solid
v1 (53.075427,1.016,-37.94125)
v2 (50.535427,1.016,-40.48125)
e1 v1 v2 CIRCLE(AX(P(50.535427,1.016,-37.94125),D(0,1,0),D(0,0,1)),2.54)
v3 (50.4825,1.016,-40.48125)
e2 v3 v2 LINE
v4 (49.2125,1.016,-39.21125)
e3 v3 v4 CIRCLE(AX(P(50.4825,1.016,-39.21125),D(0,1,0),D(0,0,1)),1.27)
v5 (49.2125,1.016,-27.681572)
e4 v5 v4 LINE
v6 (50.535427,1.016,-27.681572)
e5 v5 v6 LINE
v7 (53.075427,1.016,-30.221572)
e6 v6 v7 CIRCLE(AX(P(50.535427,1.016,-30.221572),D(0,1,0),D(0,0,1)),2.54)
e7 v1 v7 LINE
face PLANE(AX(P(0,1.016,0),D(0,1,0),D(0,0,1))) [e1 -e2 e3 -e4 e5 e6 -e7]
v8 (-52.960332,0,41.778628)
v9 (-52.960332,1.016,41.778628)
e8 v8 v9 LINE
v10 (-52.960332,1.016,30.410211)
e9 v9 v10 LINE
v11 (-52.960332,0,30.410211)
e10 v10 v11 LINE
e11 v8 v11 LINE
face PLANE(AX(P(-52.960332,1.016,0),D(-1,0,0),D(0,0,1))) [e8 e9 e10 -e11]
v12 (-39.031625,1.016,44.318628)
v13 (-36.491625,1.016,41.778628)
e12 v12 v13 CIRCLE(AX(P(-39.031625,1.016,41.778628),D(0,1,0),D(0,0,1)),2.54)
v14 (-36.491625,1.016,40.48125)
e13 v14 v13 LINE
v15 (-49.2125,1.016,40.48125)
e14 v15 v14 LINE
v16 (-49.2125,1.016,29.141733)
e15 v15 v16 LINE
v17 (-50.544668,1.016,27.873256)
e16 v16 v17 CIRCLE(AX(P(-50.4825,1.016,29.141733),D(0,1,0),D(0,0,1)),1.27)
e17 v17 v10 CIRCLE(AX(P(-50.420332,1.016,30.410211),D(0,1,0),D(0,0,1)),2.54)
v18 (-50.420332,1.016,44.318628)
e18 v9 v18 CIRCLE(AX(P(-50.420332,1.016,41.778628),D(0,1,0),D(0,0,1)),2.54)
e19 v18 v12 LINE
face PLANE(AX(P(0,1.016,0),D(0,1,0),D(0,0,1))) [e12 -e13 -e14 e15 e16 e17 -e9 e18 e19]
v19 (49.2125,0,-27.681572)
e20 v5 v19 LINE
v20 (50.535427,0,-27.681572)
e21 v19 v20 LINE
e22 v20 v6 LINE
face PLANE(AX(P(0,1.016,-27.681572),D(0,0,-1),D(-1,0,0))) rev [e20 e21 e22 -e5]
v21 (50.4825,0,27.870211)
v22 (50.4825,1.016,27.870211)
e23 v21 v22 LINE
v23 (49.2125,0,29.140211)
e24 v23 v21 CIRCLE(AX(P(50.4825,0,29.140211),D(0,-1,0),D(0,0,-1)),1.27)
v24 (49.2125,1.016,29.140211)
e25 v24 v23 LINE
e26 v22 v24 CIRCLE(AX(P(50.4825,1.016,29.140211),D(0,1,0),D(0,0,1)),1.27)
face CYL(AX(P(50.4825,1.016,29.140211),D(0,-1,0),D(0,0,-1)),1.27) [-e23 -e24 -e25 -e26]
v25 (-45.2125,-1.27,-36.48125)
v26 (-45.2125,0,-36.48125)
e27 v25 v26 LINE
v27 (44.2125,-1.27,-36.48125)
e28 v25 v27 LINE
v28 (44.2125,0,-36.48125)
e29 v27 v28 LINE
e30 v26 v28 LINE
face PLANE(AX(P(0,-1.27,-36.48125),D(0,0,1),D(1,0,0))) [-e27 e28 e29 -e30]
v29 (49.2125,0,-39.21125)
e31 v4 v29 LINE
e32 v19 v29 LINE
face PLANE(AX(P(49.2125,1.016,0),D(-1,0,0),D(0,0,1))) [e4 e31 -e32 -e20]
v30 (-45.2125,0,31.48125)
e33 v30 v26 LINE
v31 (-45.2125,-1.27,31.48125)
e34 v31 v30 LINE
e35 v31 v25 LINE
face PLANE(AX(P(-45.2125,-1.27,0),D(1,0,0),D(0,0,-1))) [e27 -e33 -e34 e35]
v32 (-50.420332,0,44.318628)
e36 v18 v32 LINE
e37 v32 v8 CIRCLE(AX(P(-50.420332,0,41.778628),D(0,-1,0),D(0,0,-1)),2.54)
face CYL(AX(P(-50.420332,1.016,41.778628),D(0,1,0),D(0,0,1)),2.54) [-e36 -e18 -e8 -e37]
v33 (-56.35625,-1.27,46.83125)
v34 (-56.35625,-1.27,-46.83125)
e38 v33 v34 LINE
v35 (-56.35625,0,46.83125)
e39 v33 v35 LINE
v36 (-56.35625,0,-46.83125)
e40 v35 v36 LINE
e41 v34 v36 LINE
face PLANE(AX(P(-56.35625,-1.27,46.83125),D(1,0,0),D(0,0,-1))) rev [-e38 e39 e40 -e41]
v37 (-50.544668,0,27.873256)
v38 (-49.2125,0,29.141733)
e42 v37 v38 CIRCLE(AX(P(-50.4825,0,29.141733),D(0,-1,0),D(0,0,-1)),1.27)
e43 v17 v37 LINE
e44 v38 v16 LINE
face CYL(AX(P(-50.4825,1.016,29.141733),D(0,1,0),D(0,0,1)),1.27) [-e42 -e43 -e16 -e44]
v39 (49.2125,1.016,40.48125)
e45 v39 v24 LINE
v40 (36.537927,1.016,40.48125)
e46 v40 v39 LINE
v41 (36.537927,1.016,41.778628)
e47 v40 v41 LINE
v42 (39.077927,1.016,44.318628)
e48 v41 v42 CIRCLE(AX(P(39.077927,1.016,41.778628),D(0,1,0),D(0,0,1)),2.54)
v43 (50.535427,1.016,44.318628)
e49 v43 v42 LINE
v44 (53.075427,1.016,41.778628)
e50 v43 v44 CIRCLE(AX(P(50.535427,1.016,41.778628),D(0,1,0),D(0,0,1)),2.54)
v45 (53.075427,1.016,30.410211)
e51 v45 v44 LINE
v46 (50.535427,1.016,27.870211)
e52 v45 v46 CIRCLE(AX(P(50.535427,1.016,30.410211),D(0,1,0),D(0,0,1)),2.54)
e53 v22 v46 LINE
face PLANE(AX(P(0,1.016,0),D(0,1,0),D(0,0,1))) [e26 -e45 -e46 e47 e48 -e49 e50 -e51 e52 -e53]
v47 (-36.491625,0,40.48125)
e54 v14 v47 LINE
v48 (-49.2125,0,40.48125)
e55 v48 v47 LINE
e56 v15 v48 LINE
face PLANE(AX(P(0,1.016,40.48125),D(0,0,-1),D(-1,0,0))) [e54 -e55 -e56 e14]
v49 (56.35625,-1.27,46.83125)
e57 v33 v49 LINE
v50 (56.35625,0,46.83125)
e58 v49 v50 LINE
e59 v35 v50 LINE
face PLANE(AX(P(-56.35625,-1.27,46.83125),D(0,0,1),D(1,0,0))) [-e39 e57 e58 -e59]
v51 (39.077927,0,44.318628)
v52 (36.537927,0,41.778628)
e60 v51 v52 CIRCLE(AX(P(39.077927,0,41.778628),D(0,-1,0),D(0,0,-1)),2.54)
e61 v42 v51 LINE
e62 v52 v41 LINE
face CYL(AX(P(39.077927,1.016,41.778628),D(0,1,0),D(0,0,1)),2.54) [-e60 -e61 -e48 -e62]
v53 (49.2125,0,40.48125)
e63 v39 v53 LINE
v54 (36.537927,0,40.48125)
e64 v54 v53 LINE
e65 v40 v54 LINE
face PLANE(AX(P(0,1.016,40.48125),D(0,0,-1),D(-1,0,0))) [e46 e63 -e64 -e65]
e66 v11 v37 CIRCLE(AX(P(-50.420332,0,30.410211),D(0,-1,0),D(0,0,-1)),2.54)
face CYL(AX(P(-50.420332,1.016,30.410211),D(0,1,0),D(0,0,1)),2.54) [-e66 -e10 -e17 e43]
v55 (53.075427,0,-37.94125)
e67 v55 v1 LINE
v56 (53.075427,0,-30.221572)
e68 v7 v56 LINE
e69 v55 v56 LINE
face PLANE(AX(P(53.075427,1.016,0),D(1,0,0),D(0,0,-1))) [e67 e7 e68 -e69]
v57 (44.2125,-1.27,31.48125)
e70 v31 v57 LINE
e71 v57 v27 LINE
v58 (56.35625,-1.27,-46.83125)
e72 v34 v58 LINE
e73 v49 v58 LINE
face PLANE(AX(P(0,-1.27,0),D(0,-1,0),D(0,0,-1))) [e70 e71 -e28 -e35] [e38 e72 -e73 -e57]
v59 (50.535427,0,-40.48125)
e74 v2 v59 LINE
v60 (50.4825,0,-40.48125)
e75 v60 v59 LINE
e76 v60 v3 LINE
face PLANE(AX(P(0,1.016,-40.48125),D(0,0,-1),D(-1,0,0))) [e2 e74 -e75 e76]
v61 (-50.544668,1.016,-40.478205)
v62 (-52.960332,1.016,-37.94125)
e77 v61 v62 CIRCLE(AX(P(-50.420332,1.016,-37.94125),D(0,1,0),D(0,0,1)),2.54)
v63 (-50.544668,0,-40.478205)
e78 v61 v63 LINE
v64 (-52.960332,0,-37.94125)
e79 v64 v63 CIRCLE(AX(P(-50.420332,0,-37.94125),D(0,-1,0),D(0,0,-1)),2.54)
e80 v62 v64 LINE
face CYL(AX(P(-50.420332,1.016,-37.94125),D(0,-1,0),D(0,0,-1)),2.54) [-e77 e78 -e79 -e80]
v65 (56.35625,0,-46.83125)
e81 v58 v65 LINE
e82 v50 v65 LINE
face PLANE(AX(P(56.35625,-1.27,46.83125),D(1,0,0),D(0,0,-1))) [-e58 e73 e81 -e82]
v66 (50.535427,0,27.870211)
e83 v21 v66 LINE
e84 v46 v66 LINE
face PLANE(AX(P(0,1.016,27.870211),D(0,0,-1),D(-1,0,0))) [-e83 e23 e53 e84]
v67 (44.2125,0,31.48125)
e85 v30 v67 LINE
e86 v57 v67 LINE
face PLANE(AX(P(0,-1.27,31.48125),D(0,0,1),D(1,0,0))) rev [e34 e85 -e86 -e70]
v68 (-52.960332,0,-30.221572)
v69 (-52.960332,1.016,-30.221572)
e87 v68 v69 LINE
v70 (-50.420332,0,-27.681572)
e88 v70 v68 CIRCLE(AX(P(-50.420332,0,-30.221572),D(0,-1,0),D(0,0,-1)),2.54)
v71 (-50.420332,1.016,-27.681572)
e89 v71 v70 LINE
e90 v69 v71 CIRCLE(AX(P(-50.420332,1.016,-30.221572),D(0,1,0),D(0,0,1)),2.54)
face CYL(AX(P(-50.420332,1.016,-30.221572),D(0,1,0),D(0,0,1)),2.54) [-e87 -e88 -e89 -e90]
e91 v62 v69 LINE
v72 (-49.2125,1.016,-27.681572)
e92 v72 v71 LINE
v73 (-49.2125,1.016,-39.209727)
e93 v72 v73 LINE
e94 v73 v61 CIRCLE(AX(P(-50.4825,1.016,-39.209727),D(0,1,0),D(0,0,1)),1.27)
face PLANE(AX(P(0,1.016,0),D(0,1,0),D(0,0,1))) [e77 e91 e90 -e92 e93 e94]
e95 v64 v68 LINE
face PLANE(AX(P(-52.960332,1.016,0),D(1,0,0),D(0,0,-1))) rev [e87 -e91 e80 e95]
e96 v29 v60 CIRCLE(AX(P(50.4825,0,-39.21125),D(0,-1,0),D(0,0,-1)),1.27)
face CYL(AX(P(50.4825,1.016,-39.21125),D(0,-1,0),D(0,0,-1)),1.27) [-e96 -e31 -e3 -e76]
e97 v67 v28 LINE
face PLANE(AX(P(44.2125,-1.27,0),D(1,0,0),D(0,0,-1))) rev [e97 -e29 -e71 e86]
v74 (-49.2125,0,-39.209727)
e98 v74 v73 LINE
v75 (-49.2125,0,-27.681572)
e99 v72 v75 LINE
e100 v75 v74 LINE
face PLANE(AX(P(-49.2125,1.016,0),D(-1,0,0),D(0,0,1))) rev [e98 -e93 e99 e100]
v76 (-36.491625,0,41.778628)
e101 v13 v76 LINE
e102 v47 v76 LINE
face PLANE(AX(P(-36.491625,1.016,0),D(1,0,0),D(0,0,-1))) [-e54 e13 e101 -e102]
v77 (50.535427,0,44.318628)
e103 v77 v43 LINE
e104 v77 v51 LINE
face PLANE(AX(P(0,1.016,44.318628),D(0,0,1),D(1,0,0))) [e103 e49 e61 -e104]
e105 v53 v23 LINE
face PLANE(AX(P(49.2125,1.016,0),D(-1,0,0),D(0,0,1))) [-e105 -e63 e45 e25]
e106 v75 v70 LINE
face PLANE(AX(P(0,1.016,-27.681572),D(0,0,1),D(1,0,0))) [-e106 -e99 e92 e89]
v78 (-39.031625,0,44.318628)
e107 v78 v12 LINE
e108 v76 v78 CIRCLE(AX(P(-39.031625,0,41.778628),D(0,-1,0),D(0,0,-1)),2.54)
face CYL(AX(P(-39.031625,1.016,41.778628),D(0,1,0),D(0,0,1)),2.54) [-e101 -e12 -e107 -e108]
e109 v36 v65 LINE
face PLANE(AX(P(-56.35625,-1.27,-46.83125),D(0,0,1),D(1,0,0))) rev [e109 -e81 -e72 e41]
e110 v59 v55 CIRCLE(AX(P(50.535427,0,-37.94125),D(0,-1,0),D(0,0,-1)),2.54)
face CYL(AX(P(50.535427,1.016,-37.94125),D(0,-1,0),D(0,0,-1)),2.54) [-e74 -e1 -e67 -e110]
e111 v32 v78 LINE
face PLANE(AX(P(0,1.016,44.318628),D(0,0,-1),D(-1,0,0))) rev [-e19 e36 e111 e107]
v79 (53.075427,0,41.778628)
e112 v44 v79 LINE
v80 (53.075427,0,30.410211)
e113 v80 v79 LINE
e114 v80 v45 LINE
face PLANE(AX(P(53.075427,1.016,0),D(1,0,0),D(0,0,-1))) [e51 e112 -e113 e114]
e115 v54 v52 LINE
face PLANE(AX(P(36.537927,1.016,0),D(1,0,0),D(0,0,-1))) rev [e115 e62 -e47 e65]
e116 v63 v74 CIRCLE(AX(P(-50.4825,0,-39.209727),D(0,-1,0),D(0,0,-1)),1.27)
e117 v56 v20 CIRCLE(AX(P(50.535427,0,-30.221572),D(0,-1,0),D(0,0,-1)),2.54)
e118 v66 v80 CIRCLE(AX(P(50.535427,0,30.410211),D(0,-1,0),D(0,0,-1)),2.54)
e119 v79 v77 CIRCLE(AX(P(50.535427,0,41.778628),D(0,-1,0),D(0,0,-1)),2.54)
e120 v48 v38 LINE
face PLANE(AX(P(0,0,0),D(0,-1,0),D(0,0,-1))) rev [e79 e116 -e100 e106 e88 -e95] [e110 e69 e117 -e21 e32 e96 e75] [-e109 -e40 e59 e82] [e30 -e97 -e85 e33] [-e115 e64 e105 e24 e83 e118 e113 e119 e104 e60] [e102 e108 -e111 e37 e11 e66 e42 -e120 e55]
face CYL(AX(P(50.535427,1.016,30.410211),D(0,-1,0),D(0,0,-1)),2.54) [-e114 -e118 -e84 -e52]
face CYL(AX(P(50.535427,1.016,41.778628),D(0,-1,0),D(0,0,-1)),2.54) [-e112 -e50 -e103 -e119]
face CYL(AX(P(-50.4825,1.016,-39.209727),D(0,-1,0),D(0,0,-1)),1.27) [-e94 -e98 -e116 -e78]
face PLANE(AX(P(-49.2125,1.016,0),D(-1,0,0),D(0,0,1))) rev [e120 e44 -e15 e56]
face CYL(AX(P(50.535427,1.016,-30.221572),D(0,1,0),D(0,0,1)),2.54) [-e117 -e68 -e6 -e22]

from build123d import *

# Parameters (mm, degrees)
BOSS_EXTRUDE2_DEPTH   = 1.016
BOSS_EXTRUDE2_2_DEPTH = 1.016
SKETCH2_W             = 3.747831998
SKETCH2_H             = 12.799678195
BOSS_EXTRUDE2_3_DEPTH = 1.016
SKETCH2_W_2           = 3.862926877
BOSS_EXTRUDE2_4_DEPTH = 1.016
SKETCH2_7_W           = 112.7125
SKETCH2_7_H           = 93.6625
BOSS_EXTRUDE14_DEPTH  = 1.27
SKETCH2_8_W           = 89.425
SKETCH2_8_H           = 67.9625
CUT_EXTRUDE4_DEPTH    = 1.27
FILLET5_R             = 2.54
FILLET6_R             = 2.54
FILLET7_R             = 2.54
FILLET8_R             = 2.54
FILLET9_R             = 1.27
FILLET10_R            = 1.27
FILLET11_R            = 1.27
FILLET12_R            = 1.27


with BuildPart() as part:
    # Sketch2 → Boss-Extrude2 (new body)
    with BuildSketch(Plane(origin=(0, 0, 0), x_dir=(1, 0, 0), z_dir=(0, 1, 0))):
        Polygon((-52.960331998, -27.870210865), (-52.960331998, -44.318627665), (-36.491625106, -44.318627665), (-36.491625106, -40.48125), (-49.2125, -40.48125), (-49.2125, -27.870210865), align=None)
    extrude(amount=BOSS_EXTRUDE2_DEPTH)



with BuildPart() as body_2:
    # Sketch2 → Boss-Extrude2 2 (new body)
    with BuildSketch(Plane(origin=(0, 0, 0), x_dir=(1, 0, 0), z_dir=(0, 1, 0))):
        Polygon((49.2125, -40.48125), (36.537927314, -40.48125), (36.537927314, -44.318627665), (53.075426877, -44.318627665), (53.075426877, -27.870210865), (49.2125, -27.870210865), align=None)
    extrude(amount=BOSS_EXTRUDE2_2_DEPTH)


with BuildPart() as body_3:
    # Sketch2 → Boss-Extrude2 3 (new body)
    with BuildSketch(Plane(origin=(0, 0, 0), x_dir=(1, 0, 0), z_dir=(0, 1, 0))):
        with Locations((-51.086415999, 34.081410903)):
            Rectangle(SKETCH2_W, SKETCH2_H)
    extrude(amount=BOSS_EXTRUDE2_3_DEPTH)


with BuildPart() as body_4:
    # Sketch2 → Boss-Extrude2 4 (new body)
    with BuildSketch(Plane(origin=(0, 0, 0), x_dir=(1, 0, 0), z_dir=(0, 1, 0))):
        with Locations((51.143963439, 34.081410903)):
            Rectangle(SKETCH2_W_2, SKETCH2_H)
    extrude(amount=BOSS_EXTRUDE2_4_DEPTH)


with BuildPart() as part_1:
    add(part.part)

    add(body_2.part)  # Boss-Extrude14 merges body 2

    add(body_3.part)  # Boss-Extrude14 merges body 3

    add(body_4.part)  # Boss-Extrude14 merges body 4
    # Sketch2<7> → Boss-Extrude14 (add)
    with BuildSketch(Plane(origin=(0, 0, 0), x_dir=(1, 0, 0), z_dir=(0, 1, 0))):
        Rectangle(SKETCH2_7_W, SKETCH2_7_H)
    extrude(amount=-BOSS_EXTRUDE14_DEPTH)

    # Sketch2<8> → Cut-Extrude4 (cut)
    with BuildSketch(Plane(origin=(0, 0, 0), x_dir=(1, 0, 0), z_dir=(0, 1, 0))):
        with Locations((-0.5, 2.5)):
            Rectangle(SKETCH2_8_W, SKETCH2_8_H)
    extrude(amount=-CUT_EXTRUDE4_DEPTH, mode=Mode.SUBTRACT)

    # Fillet5
    fillet5_edges = [part_1.edges().sort_by_distance(p)[0] for p in [
        (-52.960331998, 0.508, -27.681571805),
        (-52.960331998, 0.508, -40.48125),
    ]]
    fillet(fillet5_edges, radius=FILLET5_R)

    # Fillet6
    fillet6_edges = [part_1.edges().sort_by_distance(p)[0] for p in [
        (53.075426877, 0.508, -27.681571805),
        (53.075426877, 0.508, -40.48125),
    ]]
    fillet(fillet6_edges, radius=FILLET6_R)

    # Fillet7
    fillet7_edges = [part_1.edges().sort_by_distance(p)[0] for p in [
        (-52.960331998, 0.508, 27.870210865),
        (-52.960331998, 0.508, 44.318627665),
        (-36.491625106, 0.508, 44.318627665),
    ]]
    fillet(fillet7_edges, radius=FILLET7_R)

    # Fillet8
    fillet8_edges = [part_1.edges().sort_by_distance(p)[0] for p in [
        (36.537927314, 0.508, 44.318627665),
        (53.075426877, 0.508, 44.318627665),
        (53.075426877, 0.508, 27.870210865),
    ]]
    fillet(fillet8_edges, radius=FILLET8_R)

    # Fillet9
    fillet9_edges = [part_1.edges().sort_by_distance(p)[0] for p in [
        (-49.2125, 0.508, 27.870210865),
    ]]
    fillet(fillet9_edges, radius=FILLET9_R)

    # Fillet10
    fillet10_edges = [part_1.edges().sort_by_distance(p)[0] for p in [
        (-49.2125, 0.508, -40.48125),
    ]]
    fillet(fillet10_edges, radius=FILLET10_R)

    # Fillet11
    fillet11_edges = [part_1.edges().sort_by_distance(p)[0] for p in [
        (49.2125, 0.508, 27.870210865),
    ]]
    fillet(fillet11_edges, radius=FILLET11_R)

    # Fillet12
    fillet12_edges = [part_1.edges().sort_by_distance(p)[0] for p in [
        (49.2125, 0.508, -40.48125),
    ]]
    fillet(fillet12_edges, radius=FILLET12_R)


solid = part_1.part
